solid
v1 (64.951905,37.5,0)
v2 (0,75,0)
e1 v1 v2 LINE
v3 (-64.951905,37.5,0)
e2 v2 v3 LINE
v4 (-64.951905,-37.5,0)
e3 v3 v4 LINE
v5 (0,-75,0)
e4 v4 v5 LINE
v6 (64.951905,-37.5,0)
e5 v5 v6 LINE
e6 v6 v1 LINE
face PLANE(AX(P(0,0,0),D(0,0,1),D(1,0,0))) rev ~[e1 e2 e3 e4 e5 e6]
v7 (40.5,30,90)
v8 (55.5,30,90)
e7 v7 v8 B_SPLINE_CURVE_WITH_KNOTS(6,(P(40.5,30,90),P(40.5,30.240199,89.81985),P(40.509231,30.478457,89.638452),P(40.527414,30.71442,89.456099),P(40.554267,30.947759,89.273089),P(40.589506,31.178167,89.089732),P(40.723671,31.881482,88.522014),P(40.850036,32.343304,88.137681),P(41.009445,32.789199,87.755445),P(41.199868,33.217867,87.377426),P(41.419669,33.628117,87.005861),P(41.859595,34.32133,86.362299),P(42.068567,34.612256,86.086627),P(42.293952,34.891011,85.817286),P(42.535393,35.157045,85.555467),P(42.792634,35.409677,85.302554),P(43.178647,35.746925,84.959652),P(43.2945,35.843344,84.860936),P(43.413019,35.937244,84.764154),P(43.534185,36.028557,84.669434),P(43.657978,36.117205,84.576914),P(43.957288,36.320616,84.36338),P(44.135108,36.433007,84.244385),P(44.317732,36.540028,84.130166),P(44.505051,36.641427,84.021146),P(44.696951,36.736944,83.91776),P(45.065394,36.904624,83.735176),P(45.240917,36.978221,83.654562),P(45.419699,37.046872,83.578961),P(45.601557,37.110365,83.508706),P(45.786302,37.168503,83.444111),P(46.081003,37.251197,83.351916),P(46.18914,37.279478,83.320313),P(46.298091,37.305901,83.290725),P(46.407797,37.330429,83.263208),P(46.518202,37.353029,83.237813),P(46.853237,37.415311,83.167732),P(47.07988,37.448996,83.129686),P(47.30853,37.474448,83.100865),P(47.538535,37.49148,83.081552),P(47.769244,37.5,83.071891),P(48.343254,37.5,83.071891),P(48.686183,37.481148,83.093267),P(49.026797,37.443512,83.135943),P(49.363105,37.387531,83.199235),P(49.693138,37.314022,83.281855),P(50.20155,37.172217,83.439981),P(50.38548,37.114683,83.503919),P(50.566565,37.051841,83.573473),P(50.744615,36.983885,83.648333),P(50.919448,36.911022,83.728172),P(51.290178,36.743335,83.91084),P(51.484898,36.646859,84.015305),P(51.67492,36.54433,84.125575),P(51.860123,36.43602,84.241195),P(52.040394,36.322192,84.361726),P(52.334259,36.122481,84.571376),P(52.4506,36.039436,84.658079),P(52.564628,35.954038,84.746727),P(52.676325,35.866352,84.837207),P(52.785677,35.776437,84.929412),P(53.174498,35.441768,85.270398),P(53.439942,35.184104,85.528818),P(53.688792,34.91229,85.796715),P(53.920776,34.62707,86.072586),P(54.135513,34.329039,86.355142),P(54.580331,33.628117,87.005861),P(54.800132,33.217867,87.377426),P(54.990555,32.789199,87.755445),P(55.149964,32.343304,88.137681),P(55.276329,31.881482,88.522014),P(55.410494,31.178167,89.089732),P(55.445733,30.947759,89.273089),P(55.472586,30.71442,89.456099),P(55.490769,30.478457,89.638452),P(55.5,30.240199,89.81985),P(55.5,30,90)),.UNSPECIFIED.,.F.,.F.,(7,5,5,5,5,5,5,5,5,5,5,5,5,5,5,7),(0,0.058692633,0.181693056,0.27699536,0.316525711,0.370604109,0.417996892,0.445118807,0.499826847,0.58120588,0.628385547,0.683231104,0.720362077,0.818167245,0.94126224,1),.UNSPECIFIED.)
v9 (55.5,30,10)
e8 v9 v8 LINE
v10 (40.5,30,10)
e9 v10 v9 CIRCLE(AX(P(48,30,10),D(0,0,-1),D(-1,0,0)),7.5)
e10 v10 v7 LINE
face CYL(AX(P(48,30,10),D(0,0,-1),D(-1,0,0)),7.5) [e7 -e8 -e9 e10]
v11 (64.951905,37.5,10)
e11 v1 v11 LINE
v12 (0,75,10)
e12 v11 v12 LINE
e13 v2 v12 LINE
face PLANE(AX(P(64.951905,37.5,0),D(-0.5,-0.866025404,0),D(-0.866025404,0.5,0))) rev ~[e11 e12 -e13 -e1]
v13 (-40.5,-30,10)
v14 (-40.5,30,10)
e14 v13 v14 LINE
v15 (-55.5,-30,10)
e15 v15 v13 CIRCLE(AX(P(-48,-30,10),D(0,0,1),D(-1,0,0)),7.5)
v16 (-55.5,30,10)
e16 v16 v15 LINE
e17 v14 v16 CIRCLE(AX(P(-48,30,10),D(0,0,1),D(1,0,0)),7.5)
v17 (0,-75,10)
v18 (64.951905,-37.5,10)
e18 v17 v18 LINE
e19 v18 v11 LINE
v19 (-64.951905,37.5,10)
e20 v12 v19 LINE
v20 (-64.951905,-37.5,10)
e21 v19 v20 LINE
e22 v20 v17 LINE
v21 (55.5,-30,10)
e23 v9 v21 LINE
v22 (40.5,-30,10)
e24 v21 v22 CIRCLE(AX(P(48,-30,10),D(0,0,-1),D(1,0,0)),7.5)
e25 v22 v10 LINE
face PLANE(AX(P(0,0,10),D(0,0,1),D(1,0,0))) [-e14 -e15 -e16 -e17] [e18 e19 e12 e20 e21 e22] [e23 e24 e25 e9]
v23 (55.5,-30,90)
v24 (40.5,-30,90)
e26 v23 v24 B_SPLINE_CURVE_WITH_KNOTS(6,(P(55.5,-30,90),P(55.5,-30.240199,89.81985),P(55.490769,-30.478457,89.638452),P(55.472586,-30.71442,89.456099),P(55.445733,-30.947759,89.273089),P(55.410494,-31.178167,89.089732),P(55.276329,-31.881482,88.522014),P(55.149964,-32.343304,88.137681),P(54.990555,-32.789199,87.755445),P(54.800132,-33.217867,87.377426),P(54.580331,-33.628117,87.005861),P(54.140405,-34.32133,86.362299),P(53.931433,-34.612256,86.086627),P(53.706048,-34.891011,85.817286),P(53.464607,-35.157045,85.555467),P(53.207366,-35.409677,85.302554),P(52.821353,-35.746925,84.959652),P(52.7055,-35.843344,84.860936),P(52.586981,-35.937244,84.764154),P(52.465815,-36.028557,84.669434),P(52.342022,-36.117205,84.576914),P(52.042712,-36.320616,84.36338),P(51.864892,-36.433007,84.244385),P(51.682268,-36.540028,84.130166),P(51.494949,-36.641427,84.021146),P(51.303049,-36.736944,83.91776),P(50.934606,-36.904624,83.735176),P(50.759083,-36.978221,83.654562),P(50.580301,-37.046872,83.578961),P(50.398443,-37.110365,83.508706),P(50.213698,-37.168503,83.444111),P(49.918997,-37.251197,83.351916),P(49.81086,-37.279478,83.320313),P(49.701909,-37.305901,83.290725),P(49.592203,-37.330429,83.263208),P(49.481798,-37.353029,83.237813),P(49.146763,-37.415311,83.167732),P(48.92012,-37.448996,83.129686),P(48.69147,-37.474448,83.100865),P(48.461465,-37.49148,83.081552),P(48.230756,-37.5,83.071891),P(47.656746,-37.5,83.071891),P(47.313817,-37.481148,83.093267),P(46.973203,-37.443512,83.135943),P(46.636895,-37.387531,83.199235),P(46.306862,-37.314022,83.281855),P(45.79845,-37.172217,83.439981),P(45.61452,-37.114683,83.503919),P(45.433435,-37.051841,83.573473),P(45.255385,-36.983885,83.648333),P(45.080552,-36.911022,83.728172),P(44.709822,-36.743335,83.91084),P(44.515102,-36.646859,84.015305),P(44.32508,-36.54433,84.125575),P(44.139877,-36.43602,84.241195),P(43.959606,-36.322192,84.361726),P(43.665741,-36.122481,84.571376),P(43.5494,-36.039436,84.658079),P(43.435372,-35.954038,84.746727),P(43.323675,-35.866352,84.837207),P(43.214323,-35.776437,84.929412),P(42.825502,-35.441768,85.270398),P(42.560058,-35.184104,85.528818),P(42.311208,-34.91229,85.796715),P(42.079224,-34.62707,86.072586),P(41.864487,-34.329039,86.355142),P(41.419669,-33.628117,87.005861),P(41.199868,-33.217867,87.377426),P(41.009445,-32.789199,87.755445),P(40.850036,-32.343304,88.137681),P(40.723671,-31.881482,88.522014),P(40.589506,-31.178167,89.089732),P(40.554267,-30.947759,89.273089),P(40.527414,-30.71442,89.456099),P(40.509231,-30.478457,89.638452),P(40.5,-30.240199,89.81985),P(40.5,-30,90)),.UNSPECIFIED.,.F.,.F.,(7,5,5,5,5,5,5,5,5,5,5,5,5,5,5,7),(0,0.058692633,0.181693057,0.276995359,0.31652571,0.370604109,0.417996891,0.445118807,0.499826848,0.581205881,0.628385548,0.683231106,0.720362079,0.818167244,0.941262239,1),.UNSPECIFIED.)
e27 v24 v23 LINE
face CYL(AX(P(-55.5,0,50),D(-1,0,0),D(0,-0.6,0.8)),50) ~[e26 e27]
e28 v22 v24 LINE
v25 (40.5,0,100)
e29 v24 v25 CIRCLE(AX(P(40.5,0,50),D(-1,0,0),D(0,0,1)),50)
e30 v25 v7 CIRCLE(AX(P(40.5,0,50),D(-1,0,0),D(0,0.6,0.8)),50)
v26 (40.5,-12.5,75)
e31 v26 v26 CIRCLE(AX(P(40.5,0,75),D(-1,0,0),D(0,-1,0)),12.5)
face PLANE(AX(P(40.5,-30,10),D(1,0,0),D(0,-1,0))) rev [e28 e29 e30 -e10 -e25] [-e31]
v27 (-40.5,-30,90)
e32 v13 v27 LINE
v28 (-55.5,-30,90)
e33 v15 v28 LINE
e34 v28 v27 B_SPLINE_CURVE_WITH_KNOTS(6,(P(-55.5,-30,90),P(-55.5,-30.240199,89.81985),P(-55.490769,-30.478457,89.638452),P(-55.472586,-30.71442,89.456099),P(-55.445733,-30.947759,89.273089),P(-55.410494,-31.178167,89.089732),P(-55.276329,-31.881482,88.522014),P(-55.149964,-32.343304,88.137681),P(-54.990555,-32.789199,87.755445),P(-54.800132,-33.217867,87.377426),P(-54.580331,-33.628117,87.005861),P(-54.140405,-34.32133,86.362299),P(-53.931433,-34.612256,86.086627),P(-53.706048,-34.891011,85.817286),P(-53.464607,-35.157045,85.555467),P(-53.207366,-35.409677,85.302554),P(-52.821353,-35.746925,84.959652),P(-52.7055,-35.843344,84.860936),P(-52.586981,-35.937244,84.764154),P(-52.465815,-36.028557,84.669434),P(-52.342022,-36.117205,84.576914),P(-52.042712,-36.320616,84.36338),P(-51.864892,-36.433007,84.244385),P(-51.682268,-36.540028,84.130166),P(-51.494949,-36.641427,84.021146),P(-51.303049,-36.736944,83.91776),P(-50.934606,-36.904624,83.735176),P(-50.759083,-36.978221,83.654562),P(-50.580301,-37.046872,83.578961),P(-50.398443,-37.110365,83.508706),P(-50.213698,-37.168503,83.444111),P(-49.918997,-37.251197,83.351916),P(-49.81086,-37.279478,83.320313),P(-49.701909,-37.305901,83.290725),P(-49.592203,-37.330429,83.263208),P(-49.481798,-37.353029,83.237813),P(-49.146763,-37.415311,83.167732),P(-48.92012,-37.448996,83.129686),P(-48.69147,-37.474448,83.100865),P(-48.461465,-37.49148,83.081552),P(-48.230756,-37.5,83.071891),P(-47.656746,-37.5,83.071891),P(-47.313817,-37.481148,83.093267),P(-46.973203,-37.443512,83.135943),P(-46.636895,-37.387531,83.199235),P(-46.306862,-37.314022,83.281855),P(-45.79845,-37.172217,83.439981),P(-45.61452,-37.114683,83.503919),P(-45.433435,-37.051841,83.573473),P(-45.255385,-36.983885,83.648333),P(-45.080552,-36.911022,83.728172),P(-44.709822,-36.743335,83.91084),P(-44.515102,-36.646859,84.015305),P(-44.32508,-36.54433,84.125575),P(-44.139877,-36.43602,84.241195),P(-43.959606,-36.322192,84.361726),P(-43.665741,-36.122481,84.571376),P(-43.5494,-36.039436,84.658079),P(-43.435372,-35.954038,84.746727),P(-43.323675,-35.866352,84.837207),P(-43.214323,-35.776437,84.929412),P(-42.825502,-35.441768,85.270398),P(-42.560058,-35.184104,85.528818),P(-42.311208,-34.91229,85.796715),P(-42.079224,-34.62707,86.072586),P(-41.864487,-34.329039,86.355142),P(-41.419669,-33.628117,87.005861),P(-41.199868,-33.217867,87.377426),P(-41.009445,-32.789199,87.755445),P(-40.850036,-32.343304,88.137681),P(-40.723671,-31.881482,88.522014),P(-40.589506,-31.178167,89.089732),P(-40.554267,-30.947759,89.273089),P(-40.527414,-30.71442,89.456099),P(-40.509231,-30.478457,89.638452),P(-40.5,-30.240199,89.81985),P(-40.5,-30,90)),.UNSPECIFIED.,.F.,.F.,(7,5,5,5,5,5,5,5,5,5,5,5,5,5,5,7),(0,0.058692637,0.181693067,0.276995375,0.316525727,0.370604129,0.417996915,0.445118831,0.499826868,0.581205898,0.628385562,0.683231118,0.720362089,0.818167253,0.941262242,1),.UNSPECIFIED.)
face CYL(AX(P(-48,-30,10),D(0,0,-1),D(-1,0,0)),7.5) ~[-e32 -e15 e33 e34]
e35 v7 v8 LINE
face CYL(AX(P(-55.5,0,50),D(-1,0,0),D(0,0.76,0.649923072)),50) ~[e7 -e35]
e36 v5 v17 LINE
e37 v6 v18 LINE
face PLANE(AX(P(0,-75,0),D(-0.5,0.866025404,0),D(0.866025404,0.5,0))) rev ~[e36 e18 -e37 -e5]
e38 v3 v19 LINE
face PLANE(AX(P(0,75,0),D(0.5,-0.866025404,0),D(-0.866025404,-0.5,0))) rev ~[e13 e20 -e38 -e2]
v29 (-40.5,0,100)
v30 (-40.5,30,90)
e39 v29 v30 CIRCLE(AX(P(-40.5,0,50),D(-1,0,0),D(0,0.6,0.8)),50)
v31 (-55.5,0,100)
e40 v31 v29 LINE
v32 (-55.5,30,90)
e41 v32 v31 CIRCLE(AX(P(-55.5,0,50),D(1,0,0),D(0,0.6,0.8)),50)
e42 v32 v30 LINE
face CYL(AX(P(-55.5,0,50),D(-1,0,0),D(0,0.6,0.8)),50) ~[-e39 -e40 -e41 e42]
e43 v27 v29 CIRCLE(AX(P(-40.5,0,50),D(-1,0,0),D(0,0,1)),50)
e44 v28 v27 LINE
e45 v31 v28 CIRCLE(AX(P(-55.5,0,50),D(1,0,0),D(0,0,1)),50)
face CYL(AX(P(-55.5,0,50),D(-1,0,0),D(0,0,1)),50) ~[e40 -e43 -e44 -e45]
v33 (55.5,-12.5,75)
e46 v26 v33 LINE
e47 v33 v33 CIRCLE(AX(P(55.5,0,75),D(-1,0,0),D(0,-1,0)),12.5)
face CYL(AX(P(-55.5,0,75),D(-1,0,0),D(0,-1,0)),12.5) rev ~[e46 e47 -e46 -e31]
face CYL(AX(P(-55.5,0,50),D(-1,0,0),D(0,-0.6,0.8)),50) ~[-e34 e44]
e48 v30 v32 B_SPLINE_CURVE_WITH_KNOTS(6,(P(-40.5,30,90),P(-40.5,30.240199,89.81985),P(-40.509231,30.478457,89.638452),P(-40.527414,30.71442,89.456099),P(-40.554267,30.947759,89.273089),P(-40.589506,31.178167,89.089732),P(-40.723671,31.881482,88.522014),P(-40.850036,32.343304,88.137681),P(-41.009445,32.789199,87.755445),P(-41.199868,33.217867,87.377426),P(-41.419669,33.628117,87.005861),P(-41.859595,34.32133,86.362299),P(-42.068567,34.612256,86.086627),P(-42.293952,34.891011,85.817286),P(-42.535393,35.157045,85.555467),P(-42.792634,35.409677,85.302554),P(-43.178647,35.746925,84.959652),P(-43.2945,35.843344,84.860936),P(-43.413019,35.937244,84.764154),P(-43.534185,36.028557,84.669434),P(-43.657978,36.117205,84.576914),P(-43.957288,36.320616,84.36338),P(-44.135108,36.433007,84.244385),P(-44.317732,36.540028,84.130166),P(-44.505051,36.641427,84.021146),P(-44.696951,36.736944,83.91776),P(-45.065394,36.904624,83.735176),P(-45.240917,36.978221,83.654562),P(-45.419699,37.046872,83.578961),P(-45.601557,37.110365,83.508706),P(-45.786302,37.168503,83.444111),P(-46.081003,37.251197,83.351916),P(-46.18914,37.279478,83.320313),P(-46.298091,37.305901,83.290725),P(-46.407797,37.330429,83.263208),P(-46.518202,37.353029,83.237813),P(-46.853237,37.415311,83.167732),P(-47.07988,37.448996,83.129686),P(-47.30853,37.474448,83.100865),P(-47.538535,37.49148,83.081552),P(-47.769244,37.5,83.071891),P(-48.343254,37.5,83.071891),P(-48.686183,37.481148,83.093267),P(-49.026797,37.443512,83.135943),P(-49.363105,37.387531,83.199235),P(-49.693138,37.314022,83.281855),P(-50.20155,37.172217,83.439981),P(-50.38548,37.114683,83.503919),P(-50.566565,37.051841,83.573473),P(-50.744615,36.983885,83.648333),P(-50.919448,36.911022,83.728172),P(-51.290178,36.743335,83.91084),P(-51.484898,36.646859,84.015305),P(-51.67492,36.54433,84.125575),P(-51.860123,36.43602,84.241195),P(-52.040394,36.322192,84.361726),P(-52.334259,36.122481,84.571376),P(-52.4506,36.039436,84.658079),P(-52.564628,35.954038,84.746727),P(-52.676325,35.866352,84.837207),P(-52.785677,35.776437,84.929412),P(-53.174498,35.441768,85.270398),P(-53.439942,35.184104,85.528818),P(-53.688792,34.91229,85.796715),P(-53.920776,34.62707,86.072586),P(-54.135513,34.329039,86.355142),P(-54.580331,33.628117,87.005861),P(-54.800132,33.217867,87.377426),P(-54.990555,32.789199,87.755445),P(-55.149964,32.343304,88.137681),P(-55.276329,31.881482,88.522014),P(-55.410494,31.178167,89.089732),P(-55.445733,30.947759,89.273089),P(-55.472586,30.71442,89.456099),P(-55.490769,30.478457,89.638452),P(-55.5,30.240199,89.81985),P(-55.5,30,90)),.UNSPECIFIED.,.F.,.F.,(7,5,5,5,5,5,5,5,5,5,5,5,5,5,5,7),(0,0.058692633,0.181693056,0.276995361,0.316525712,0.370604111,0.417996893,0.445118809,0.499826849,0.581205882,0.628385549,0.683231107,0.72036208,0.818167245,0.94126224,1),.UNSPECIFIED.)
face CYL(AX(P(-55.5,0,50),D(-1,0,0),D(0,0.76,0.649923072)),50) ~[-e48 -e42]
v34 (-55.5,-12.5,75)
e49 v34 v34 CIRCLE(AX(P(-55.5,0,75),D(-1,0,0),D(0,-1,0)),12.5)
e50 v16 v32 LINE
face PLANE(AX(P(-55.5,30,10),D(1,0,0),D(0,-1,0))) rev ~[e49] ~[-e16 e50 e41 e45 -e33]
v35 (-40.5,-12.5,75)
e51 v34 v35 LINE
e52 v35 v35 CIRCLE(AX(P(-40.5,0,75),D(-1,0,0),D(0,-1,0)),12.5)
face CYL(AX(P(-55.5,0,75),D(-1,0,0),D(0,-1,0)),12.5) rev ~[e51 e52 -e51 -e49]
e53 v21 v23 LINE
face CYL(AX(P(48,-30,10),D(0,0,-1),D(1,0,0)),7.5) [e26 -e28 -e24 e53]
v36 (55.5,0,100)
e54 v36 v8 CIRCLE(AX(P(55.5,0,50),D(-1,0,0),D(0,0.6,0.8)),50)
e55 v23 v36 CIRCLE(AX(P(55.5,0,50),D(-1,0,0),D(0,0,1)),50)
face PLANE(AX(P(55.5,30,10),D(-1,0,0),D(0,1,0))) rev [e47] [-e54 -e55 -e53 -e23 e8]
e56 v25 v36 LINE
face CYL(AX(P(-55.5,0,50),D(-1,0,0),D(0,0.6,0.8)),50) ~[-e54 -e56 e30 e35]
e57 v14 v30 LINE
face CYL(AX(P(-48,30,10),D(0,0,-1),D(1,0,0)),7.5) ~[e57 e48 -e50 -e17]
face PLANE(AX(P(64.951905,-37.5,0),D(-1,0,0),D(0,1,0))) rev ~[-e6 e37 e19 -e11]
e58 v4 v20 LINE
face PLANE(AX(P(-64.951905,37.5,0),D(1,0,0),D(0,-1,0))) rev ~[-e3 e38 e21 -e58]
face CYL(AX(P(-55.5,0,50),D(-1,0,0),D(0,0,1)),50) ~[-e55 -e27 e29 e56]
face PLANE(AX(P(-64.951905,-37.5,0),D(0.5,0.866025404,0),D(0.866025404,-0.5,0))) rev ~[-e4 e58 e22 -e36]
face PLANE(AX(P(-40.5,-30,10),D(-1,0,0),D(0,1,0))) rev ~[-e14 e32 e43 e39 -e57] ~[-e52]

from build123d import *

# Parameters (mm, degrees)
F1_DEPTH = 10
F3_DEPTH = 90
F4_R     = 12.5
F5_DEPTH = 120.4529052838


# Not quite as in the source:
# - a pattern or mirror of a feature is missing from the dataset's text; its kind, count and spacing are read off the source's solid


with BuildPart() as f1:
    # F0 (on Top) → F1 (new body)
    with BuildSketch(Plane.XY):
        Polygon((-64.9519052838, -37.5), (0, -75), (64.9519052838, -37.5), (64.9519052838, 37.5), (0, 75), (-64.9519052838, 37.5), align=None)
    extrude(amount=F1_DEPTH)

    # F2 (on face) → F3 (join)
    with BuildSketch(Plane.XY.offset(10)):
        with BuildLine():
            Line((-40.5, -30), (-40.5, 0))
            ThreePointArc((-40.5, 0), (-48, -7.5), (-55.5, 0))
            Line((-55.5, 0), (-55.5, -30))
            ThreePointArc((-55.5, -30), (-48, -37.5), (-40.5, -30))
        make_face()
        with BuildLine():
            ThreePointArc((-55.5, 0), (-48, -7.5), (-40.5, 0))
            ThreePointArc((-40.5, 0), (-48, 7.5), (-55.5, 0))
        make_face()
        with BuildLine():
            ThreePointArc((-55.5, 0), (-48, 7.5), (-40.5, 0))
            Line((-40.5, 0), (-40.5, 30))
            ThreePointArc((-40.5, 30), (-48, 37.5), (-55.5, 30))
            Line((-55.5, 30), (-55.5, 0))
        make_face()
    f3 = extrude(amount=F3_DEPTH)

    # F3_copies: F3 across plane
    add(f3.mirror(Plane(origin=(0, 0, 0), x_dir=(0, 0, 1), z_dir=(1, 0, 0))))

    # F4 (on face) → F5 (cut, through all)
    with BuildSketch(Plane(origin=(-55.5, 0, 0), x_dir=(0, -1, 0), z_dir=(-1, 0, 0))):
        with BuildLine():
            ThreePointArc((-38, 82.4961536185), (-34.2063872344, 86.4681103482), (-30, 90))
            Line((-30, 90), (-30, 100))
            Line((-30, 100), (-38, 100))
            Line((-38, 100), (-38, 82.4961536185))
        make_face()
        with BuildLine():
            ThreePointArc((-30, 90), (-15.8113883008, 97.4341649025), (0, 100))
            Line((0, 100), (-30, 100))
            Line((-30, 100), (-30, 90))
        make_face()
        with BuildLine():
            ThreePointArc((0, 100), (15.8113883008, 97.4341649025), (30, 90))
            Line((30, 90), (30, 100))
            Line((30, 100), (0, 100))
        make_face()
        with BuildLine():
            ThreePointArc((30, 90), (34.2063872344, 86.4681103482), (38, 82.4961536185))
            Line((38, 82.4961536185), (38, 100))
            Line((38, 100), (30, 100))
            Line((30, 100), (30, 90))
        make_face()
        with Locations((0, 75)):
            Circle(F4_R)
    extrude(amount=-F5_DEPTH, mode=Mode.SUBTRACT)


solid = f1.part
